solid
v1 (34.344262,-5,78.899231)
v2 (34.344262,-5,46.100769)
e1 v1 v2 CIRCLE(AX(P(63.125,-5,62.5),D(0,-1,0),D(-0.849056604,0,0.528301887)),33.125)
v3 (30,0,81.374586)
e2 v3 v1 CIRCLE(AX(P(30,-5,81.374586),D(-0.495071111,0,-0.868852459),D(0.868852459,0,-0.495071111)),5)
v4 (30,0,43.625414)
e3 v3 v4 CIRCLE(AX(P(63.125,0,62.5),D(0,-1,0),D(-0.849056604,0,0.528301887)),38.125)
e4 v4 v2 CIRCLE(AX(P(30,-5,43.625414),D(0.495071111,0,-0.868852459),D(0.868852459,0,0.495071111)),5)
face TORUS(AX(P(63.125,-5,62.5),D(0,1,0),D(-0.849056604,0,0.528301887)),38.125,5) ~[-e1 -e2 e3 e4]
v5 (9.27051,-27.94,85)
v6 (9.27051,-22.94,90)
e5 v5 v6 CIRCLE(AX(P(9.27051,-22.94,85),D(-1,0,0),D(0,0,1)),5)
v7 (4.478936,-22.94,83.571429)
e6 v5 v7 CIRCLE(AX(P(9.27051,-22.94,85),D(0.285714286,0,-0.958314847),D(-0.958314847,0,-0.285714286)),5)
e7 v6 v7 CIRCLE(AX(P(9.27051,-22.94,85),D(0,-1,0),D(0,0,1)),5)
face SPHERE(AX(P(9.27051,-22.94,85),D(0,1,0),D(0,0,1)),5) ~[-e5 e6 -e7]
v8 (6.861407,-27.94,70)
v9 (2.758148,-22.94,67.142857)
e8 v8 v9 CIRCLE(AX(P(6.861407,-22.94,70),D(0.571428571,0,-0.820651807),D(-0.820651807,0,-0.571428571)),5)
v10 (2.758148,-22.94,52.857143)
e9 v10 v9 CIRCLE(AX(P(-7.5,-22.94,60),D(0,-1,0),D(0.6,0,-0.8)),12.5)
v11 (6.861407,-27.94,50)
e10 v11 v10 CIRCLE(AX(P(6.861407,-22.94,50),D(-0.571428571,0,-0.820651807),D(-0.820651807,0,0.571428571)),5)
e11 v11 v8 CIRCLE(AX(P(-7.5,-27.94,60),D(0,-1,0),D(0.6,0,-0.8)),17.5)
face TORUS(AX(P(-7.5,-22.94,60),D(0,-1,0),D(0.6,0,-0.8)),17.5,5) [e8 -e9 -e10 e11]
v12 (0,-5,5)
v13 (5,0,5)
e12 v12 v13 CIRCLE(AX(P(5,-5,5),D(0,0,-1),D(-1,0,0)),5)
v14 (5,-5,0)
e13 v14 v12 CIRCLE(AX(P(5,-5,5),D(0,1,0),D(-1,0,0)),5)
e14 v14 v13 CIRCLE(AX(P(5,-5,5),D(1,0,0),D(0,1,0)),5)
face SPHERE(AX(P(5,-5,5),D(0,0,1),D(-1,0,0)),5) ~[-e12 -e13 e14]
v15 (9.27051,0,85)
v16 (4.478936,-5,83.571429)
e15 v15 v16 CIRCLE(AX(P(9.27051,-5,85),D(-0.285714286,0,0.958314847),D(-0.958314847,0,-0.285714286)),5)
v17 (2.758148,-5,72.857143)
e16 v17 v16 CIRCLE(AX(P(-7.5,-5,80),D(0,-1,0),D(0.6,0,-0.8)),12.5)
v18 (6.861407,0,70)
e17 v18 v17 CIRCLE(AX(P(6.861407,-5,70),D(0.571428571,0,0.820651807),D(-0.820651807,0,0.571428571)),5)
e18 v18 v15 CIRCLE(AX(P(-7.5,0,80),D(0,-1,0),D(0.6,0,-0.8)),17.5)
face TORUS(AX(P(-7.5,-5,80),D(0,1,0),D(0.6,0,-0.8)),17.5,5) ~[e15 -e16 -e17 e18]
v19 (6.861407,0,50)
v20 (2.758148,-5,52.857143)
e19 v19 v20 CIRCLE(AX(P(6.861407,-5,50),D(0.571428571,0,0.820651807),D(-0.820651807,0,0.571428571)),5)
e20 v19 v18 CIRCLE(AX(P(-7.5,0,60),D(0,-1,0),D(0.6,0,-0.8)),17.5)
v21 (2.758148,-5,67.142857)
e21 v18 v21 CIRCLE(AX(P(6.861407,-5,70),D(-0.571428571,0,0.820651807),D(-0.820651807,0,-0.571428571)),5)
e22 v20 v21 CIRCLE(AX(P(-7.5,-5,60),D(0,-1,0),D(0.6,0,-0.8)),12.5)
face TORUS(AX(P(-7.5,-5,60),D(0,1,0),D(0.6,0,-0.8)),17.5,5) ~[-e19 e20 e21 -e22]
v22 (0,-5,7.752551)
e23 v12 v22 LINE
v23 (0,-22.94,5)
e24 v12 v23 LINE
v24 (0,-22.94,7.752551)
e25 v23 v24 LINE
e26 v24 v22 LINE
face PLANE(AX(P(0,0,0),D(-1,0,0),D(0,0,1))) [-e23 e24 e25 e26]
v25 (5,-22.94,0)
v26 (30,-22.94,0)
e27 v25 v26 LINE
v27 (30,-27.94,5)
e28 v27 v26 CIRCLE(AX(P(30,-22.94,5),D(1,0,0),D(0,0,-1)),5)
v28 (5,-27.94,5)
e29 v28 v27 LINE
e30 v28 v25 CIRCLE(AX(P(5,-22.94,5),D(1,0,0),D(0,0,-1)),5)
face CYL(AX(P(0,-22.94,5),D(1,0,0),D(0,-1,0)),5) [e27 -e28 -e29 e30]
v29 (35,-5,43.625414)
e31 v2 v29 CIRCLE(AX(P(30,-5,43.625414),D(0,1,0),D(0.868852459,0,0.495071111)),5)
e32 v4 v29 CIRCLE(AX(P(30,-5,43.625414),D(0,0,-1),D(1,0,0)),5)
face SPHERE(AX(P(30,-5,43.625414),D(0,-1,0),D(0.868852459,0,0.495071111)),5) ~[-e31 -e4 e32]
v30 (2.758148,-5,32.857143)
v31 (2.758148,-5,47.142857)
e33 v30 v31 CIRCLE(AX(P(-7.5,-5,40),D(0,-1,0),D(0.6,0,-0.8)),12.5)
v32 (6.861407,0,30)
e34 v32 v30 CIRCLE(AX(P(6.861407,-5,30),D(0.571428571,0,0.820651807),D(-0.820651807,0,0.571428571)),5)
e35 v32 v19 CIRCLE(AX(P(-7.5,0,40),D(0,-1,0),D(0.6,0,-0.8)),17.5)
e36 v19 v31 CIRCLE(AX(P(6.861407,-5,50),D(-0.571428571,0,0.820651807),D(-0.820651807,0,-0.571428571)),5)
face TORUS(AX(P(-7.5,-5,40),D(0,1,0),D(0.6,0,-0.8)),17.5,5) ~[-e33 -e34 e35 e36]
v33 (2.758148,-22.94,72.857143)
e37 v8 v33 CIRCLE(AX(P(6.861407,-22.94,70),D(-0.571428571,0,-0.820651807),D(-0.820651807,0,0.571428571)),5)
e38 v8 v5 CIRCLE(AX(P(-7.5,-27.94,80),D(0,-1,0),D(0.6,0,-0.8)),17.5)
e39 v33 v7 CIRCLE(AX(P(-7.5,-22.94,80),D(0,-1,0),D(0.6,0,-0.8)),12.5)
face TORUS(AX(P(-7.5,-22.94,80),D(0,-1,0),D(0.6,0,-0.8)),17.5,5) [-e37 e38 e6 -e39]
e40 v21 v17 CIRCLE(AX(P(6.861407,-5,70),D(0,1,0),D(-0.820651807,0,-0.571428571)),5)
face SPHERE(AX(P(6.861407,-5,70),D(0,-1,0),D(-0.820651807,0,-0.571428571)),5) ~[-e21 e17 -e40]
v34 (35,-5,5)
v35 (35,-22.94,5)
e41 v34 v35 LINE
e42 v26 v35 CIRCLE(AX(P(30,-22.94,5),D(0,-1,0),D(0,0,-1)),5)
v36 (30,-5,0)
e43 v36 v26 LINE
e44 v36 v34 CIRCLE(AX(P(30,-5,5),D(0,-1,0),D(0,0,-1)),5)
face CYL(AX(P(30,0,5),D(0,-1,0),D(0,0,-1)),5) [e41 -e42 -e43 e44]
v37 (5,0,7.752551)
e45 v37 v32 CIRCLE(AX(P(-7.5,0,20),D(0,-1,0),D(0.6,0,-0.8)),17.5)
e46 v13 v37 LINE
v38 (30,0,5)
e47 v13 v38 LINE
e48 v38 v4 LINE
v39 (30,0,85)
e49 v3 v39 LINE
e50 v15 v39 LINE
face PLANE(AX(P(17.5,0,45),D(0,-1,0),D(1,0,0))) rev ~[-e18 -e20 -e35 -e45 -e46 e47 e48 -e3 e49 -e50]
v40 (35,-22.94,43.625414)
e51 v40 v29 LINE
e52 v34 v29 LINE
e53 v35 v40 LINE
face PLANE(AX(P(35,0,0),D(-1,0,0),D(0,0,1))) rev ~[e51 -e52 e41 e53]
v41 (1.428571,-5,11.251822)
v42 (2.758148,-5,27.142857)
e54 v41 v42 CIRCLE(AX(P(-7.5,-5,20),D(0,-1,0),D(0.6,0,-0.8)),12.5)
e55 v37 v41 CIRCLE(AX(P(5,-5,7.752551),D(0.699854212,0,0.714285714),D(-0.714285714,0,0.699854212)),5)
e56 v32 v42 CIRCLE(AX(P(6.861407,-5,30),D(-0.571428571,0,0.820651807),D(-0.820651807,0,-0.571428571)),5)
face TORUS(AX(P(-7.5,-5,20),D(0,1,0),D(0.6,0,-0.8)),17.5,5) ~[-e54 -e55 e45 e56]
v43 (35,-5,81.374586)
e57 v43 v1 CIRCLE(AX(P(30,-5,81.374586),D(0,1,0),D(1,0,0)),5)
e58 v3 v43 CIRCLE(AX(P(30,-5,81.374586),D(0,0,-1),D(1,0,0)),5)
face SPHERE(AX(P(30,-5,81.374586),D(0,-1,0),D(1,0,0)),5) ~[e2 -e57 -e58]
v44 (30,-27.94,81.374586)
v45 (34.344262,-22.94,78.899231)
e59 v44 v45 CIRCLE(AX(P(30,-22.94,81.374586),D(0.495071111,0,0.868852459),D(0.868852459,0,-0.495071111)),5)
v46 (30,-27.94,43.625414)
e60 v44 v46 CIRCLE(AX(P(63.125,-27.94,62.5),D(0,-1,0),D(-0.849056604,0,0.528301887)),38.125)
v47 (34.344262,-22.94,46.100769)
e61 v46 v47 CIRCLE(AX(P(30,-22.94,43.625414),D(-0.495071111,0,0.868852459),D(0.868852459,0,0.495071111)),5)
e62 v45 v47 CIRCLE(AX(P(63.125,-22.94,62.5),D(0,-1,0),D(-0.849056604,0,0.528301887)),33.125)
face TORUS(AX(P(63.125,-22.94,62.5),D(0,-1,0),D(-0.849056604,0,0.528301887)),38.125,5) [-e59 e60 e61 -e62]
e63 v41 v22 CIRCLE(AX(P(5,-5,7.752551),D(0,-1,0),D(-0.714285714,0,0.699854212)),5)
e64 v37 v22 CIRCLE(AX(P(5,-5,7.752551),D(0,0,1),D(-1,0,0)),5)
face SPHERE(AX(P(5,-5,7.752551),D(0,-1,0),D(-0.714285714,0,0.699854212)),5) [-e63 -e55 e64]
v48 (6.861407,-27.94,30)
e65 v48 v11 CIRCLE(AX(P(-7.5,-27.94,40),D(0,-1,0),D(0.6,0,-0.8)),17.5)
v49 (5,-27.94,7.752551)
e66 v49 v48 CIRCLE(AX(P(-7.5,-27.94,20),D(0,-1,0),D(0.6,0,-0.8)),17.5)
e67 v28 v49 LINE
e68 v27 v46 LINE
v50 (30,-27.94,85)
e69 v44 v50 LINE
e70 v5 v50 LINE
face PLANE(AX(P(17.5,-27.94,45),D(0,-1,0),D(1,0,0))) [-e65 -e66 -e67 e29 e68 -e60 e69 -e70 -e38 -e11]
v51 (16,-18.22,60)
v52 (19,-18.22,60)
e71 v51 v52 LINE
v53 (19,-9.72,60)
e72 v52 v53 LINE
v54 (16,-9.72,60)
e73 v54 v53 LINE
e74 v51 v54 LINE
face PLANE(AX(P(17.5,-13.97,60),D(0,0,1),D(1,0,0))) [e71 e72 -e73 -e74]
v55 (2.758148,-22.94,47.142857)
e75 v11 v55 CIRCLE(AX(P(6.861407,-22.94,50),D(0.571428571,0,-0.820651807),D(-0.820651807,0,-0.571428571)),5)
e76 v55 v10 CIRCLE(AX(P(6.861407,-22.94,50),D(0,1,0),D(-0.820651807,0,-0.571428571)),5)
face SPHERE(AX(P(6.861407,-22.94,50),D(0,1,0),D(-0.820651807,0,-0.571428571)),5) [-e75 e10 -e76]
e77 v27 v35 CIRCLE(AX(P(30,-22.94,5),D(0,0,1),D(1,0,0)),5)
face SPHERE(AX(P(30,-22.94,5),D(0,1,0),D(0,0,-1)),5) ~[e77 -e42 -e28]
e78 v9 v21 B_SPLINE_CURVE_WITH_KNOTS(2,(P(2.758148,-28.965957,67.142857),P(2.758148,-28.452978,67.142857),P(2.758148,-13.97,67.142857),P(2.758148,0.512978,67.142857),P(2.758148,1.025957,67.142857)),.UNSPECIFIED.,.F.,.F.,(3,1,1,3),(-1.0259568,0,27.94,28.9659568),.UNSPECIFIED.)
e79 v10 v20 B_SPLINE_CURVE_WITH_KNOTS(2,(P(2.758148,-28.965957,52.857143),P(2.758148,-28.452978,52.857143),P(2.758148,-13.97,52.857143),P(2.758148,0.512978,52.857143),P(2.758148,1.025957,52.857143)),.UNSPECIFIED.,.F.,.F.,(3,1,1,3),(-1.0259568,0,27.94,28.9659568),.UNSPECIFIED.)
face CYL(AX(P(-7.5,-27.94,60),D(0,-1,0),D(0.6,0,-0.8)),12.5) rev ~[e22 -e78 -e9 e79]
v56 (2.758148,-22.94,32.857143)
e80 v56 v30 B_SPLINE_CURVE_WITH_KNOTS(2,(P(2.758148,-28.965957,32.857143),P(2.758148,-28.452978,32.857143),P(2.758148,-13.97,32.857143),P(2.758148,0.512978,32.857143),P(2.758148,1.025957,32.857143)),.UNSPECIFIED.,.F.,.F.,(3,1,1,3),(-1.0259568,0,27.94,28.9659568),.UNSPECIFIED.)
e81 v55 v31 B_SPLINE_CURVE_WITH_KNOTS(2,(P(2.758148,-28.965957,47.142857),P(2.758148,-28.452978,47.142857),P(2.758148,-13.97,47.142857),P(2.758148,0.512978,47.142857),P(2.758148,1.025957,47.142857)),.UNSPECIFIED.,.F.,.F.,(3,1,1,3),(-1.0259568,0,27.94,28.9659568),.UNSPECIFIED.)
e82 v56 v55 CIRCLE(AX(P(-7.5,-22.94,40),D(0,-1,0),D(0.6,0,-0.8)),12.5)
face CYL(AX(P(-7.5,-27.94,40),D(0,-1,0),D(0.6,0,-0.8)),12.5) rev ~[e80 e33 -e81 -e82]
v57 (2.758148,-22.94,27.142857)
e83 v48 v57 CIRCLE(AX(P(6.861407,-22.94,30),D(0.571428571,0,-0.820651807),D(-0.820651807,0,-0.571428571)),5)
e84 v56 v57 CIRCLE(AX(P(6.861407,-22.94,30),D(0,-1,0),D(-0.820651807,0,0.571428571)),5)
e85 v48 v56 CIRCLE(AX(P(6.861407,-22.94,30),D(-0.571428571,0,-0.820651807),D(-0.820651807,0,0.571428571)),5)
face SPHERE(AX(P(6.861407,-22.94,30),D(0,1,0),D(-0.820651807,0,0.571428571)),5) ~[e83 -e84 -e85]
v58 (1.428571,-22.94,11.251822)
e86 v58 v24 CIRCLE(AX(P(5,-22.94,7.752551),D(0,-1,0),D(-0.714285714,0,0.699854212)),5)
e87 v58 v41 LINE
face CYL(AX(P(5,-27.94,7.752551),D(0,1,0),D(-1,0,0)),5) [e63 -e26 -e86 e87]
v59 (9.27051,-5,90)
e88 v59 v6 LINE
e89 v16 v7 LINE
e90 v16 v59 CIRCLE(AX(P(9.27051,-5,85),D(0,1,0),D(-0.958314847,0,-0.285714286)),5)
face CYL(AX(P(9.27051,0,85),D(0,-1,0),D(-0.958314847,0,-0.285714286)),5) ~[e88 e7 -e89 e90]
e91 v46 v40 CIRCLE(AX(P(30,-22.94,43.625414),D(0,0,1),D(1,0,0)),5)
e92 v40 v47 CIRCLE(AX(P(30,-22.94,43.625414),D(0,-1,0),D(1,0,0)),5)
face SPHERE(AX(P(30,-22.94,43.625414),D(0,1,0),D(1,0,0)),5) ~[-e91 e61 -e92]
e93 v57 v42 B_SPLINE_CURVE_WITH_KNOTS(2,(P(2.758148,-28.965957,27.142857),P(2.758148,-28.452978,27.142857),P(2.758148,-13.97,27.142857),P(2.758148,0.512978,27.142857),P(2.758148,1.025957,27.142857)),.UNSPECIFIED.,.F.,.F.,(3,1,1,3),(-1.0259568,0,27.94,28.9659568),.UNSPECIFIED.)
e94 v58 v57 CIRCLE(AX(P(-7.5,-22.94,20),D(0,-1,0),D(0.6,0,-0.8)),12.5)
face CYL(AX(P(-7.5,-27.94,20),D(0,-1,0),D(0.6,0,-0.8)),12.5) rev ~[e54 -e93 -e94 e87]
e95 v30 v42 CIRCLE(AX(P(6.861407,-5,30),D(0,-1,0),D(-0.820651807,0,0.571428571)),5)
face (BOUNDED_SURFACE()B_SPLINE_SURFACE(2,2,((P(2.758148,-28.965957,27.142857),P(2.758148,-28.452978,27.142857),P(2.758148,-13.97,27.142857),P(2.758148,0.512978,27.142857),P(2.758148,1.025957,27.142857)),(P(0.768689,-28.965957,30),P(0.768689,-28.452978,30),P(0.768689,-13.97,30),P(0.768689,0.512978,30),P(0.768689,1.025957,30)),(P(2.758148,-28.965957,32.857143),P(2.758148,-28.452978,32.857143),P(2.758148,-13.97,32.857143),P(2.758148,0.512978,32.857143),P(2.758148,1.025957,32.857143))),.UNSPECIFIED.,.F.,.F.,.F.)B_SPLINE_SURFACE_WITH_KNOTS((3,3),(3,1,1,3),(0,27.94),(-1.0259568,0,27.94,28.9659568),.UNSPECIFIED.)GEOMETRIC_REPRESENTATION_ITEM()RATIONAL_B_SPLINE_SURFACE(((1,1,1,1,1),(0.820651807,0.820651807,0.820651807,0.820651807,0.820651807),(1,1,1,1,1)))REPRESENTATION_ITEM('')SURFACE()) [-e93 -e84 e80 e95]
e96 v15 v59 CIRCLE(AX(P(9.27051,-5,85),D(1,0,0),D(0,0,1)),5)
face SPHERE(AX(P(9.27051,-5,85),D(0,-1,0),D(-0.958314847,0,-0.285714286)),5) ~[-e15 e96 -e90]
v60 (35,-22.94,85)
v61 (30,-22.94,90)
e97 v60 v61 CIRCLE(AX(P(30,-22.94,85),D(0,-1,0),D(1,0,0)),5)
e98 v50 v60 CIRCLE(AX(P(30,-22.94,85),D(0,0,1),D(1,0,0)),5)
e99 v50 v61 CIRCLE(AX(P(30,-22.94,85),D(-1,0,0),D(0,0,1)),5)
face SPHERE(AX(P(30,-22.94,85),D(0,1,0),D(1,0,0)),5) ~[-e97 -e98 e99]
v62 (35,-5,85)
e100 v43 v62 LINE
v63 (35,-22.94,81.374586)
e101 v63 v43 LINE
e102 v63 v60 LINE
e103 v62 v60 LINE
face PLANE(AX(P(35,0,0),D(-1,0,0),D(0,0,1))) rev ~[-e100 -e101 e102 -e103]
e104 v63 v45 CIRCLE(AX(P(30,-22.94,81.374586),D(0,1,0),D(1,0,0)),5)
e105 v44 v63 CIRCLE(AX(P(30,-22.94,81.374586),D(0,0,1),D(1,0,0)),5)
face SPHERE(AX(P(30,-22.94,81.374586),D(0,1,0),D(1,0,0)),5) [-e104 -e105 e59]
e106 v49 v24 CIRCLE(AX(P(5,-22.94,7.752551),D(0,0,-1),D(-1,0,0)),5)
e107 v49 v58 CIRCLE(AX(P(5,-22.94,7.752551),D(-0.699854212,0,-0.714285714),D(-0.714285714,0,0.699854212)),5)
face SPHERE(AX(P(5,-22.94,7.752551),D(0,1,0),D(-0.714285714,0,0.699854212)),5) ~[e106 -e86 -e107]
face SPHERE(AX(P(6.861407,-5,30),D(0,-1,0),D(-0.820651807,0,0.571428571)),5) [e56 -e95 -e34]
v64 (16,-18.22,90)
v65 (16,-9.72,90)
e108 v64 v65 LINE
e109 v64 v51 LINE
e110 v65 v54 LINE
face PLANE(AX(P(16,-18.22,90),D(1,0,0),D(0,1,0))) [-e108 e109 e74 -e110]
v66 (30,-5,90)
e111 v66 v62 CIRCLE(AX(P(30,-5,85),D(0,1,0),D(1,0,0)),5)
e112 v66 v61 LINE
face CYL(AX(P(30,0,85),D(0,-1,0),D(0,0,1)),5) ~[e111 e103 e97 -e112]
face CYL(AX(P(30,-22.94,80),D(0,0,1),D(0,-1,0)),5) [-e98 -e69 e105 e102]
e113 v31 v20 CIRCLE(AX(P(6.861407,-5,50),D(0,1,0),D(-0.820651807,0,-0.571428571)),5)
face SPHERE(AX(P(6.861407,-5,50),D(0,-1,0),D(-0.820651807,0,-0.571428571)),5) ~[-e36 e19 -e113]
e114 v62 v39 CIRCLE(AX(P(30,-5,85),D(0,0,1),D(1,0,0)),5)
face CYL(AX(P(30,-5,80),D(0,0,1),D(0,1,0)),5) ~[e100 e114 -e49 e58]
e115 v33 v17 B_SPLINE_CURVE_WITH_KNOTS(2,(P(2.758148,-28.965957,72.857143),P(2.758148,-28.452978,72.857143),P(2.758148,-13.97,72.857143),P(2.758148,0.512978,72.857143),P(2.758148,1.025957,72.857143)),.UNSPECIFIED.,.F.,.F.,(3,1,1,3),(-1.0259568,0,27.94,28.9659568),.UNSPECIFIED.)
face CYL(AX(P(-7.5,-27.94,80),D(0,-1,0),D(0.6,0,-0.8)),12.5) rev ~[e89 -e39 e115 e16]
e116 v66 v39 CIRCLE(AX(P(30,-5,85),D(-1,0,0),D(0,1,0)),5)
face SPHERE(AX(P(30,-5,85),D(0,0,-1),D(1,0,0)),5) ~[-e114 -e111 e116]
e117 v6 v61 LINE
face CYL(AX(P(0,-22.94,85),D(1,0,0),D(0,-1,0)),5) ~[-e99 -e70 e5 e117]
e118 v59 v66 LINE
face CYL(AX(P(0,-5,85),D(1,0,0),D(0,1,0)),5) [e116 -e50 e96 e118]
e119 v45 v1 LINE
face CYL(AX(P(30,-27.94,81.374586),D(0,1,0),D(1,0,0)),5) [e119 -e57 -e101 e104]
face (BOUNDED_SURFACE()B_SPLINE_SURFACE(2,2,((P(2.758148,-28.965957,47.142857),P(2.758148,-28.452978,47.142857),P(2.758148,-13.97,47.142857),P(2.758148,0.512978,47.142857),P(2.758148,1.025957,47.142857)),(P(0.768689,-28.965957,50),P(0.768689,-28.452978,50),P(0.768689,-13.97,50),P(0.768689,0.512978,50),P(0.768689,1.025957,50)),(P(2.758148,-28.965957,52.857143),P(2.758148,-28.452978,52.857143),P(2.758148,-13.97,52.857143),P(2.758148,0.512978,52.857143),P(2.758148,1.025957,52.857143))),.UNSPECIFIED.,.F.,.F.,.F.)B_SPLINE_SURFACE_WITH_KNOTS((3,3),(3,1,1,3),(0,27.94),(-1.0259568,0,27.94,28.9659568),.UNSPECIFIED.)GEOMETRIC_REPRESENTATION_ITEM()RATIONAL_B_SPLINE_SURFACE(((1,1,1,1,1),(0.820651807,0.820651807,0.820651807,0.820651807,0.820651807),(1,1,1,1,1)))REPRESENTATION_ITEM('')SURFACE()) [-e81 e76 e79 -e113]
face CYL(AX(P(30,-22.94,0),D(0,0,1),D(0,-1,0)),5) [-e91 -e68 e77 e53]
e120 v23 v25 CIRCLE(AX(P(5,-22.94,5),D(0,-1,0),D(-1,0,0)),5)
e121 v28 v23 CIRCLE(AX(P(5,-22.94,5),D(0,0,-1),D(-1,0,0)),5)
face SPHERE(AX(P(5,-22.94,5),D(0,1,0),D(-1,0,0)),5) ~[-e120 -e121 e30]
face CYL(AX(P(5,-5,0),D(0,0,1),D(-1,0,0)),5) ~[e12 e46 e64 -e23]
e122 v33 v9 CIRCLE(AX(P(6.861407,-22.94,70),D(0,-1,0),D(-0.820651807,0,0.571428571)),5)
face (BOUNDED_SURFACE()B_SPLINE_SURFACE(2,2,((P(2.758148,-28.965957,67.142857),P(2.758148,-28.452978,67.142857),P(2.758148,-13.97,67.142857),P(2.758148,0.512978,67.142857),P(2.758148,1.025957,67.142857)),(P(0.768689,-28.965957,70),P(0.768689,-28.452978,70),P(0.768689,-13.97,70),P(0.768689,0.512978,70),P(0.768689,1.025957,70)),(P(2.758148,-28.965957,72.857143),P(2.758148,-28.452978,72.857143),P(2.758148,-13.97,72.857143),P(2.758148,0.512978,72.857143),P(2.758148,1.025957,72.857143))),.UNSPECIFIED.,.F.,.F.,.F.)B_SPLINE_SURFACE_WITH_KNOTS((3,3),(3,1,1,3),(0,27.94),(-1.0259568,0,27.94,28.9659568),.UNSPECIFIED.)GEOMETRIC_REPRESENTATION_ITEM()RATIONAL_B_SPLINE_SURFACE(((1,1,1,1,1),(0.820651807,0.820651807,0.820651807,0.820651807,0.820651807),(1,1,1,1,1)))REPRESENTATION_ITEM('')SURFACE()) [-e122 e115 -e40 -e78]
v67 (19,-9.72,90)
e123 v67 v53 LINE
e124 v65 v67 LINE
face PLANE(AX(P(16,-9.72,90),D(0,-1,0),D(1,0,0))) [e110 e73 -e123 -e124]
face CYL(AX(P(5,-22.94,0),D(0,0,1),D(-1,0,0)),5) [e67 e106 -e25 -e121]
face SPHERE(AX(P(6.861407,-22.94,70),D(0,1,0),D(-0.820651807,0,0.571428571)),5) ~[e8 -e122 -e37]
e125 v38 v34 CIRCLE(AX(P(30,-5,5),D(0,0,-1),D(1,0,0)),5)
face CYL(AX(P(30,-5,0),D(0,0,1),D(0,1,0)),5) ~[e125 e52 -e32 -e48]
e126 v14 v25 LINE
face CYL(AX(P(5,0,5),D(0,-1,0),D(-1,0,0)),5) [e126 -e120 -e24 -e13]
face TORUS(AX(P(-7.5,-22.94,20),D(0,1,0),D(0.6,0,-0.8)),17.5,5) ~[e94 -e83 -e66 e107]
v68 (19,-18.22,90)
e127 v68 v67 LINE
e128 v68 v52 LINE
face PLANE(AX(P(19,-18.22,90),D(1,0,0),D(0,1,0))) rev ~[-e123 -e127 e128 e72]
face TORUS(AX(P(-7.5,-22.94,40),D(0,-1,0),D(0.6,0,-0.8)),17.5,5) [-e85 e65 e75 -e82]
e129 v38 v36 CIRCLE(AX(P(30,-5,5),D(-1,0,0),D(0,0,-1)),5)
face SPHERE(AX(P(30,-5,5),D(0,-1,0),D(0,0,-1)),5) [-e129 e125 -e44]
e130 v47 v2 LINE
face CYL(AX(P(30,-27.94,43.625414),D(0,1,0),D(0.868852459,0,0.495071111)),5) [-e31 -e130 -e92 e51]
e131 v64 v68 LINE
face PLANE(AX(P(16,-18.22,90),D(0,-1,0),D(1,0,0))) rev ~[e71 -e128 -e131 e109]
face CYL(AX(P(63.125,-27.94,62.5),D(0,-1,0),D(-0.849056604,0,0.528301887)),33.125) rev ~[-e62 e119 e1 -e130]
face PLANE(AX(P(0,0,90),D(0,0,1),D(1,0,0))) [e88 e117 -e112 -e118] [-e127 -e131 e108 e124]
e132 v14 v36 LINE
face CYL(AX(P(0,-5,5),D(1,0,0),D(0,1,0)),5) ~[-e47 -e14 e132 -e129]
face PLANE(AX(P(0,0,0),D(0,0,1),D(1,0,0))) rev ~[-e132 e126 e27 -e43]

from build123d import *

# Parameters (mm, degrees)
F0_W     = 35
F0_H     = 90
F1_DEPTH = 27.94
F3_DEPTH = 27.941
F4_W     = 3
F4_H     = 8.5
F5_DEPTH = 30
F6_R     = 5


with BuildPart() as f1:
    # F0 (on Front) → F1 (new body)
    with BuildSketch(Plane.XZ):
        with Locations((17.5, 45)):
            Rectangle(F0_W, F0_H)
    extrude(amount=F1_DEPTH)

    # F2 (on face) → F3 (cut, through all)
    with BuildSketch(Plane.XZ.offset(27.94)):
        with BuildLine():
            Line((35, 45), (35, 80))
            ThreePointArc((35, 80), (30, 62.5), (35, 45))
        make_face()
        with BuildLine():
            ThreePointArc((0, 70), (5, 80), (0, 90))
            Line((0, 90), (0, 70))
        make_face()
        with BuildLine():
            ThreePointArc((0, 50), (5, 60), (0, 70))
            Line((0, 70), (0, 50))
        make_face()
        with BuildLine():
            ThreePointArc((0, 30), (5, 40), (0, 50))
            Line((0, 50), (0, 30))
        make_face()
        with BuildLine():
            Line((0, 30), (0, 10))
            ThreePointArc((0, 10), (5, 20), (0, 30))
        make_face()
    extrude(amount=-F3_DEPTH, mode=Mode.SUBTRACT)

    # F4 (on face) → F5 (cut)
    with BuildSketch(Plane.XY.offset(90)):
        with Locations((17.5, -13.97)):
            Rectangle(F4_W, F4_H)
    extrude(amount=-F5_DEPTH, mode=Mode.SUBTRACT)

    # F6
    f6_edges = [f1.edges().sort_by_distance(p)[0] for p in [
        (5, -27.94, 60),
        (0, -13.97, 70),
        (5, 0, 60),
        (0, -13.97, 50),
        (5, -27.94, 80),
        (0, -13.97, 90),
        (5, 0, 80),
        (5, 0, 40),
        (5, -27.94, 40),
        (0, 0, 5),
        (0, -13.97, 0),
        (0, -27.94, 5),
        (0, -13.97, 10),
        (35, -13.97, 0),
        (17.5, 0, 0),
        (17.5, -27.94, 0),
        (35, 0, 22.5),
        (35, -13.97, 45),
        (35, -27.94, 22.5),
        (30, -27.94, 62.5),
        (30, 0, 62.5),
        (35, -13.97, 80),
        (35, 0, 85),
        (35, -13.97, 90),
        (35, -27.94, 85),
        (17.5, 0, 90),
        (17.5, -27.94, 90),
        (5, -27.94, 20),
        (5, 0, 20),
        (0, -13.97, 30),
    ]]
    fillet(f6_edges, radius=F6_R)


solid = f1.part
